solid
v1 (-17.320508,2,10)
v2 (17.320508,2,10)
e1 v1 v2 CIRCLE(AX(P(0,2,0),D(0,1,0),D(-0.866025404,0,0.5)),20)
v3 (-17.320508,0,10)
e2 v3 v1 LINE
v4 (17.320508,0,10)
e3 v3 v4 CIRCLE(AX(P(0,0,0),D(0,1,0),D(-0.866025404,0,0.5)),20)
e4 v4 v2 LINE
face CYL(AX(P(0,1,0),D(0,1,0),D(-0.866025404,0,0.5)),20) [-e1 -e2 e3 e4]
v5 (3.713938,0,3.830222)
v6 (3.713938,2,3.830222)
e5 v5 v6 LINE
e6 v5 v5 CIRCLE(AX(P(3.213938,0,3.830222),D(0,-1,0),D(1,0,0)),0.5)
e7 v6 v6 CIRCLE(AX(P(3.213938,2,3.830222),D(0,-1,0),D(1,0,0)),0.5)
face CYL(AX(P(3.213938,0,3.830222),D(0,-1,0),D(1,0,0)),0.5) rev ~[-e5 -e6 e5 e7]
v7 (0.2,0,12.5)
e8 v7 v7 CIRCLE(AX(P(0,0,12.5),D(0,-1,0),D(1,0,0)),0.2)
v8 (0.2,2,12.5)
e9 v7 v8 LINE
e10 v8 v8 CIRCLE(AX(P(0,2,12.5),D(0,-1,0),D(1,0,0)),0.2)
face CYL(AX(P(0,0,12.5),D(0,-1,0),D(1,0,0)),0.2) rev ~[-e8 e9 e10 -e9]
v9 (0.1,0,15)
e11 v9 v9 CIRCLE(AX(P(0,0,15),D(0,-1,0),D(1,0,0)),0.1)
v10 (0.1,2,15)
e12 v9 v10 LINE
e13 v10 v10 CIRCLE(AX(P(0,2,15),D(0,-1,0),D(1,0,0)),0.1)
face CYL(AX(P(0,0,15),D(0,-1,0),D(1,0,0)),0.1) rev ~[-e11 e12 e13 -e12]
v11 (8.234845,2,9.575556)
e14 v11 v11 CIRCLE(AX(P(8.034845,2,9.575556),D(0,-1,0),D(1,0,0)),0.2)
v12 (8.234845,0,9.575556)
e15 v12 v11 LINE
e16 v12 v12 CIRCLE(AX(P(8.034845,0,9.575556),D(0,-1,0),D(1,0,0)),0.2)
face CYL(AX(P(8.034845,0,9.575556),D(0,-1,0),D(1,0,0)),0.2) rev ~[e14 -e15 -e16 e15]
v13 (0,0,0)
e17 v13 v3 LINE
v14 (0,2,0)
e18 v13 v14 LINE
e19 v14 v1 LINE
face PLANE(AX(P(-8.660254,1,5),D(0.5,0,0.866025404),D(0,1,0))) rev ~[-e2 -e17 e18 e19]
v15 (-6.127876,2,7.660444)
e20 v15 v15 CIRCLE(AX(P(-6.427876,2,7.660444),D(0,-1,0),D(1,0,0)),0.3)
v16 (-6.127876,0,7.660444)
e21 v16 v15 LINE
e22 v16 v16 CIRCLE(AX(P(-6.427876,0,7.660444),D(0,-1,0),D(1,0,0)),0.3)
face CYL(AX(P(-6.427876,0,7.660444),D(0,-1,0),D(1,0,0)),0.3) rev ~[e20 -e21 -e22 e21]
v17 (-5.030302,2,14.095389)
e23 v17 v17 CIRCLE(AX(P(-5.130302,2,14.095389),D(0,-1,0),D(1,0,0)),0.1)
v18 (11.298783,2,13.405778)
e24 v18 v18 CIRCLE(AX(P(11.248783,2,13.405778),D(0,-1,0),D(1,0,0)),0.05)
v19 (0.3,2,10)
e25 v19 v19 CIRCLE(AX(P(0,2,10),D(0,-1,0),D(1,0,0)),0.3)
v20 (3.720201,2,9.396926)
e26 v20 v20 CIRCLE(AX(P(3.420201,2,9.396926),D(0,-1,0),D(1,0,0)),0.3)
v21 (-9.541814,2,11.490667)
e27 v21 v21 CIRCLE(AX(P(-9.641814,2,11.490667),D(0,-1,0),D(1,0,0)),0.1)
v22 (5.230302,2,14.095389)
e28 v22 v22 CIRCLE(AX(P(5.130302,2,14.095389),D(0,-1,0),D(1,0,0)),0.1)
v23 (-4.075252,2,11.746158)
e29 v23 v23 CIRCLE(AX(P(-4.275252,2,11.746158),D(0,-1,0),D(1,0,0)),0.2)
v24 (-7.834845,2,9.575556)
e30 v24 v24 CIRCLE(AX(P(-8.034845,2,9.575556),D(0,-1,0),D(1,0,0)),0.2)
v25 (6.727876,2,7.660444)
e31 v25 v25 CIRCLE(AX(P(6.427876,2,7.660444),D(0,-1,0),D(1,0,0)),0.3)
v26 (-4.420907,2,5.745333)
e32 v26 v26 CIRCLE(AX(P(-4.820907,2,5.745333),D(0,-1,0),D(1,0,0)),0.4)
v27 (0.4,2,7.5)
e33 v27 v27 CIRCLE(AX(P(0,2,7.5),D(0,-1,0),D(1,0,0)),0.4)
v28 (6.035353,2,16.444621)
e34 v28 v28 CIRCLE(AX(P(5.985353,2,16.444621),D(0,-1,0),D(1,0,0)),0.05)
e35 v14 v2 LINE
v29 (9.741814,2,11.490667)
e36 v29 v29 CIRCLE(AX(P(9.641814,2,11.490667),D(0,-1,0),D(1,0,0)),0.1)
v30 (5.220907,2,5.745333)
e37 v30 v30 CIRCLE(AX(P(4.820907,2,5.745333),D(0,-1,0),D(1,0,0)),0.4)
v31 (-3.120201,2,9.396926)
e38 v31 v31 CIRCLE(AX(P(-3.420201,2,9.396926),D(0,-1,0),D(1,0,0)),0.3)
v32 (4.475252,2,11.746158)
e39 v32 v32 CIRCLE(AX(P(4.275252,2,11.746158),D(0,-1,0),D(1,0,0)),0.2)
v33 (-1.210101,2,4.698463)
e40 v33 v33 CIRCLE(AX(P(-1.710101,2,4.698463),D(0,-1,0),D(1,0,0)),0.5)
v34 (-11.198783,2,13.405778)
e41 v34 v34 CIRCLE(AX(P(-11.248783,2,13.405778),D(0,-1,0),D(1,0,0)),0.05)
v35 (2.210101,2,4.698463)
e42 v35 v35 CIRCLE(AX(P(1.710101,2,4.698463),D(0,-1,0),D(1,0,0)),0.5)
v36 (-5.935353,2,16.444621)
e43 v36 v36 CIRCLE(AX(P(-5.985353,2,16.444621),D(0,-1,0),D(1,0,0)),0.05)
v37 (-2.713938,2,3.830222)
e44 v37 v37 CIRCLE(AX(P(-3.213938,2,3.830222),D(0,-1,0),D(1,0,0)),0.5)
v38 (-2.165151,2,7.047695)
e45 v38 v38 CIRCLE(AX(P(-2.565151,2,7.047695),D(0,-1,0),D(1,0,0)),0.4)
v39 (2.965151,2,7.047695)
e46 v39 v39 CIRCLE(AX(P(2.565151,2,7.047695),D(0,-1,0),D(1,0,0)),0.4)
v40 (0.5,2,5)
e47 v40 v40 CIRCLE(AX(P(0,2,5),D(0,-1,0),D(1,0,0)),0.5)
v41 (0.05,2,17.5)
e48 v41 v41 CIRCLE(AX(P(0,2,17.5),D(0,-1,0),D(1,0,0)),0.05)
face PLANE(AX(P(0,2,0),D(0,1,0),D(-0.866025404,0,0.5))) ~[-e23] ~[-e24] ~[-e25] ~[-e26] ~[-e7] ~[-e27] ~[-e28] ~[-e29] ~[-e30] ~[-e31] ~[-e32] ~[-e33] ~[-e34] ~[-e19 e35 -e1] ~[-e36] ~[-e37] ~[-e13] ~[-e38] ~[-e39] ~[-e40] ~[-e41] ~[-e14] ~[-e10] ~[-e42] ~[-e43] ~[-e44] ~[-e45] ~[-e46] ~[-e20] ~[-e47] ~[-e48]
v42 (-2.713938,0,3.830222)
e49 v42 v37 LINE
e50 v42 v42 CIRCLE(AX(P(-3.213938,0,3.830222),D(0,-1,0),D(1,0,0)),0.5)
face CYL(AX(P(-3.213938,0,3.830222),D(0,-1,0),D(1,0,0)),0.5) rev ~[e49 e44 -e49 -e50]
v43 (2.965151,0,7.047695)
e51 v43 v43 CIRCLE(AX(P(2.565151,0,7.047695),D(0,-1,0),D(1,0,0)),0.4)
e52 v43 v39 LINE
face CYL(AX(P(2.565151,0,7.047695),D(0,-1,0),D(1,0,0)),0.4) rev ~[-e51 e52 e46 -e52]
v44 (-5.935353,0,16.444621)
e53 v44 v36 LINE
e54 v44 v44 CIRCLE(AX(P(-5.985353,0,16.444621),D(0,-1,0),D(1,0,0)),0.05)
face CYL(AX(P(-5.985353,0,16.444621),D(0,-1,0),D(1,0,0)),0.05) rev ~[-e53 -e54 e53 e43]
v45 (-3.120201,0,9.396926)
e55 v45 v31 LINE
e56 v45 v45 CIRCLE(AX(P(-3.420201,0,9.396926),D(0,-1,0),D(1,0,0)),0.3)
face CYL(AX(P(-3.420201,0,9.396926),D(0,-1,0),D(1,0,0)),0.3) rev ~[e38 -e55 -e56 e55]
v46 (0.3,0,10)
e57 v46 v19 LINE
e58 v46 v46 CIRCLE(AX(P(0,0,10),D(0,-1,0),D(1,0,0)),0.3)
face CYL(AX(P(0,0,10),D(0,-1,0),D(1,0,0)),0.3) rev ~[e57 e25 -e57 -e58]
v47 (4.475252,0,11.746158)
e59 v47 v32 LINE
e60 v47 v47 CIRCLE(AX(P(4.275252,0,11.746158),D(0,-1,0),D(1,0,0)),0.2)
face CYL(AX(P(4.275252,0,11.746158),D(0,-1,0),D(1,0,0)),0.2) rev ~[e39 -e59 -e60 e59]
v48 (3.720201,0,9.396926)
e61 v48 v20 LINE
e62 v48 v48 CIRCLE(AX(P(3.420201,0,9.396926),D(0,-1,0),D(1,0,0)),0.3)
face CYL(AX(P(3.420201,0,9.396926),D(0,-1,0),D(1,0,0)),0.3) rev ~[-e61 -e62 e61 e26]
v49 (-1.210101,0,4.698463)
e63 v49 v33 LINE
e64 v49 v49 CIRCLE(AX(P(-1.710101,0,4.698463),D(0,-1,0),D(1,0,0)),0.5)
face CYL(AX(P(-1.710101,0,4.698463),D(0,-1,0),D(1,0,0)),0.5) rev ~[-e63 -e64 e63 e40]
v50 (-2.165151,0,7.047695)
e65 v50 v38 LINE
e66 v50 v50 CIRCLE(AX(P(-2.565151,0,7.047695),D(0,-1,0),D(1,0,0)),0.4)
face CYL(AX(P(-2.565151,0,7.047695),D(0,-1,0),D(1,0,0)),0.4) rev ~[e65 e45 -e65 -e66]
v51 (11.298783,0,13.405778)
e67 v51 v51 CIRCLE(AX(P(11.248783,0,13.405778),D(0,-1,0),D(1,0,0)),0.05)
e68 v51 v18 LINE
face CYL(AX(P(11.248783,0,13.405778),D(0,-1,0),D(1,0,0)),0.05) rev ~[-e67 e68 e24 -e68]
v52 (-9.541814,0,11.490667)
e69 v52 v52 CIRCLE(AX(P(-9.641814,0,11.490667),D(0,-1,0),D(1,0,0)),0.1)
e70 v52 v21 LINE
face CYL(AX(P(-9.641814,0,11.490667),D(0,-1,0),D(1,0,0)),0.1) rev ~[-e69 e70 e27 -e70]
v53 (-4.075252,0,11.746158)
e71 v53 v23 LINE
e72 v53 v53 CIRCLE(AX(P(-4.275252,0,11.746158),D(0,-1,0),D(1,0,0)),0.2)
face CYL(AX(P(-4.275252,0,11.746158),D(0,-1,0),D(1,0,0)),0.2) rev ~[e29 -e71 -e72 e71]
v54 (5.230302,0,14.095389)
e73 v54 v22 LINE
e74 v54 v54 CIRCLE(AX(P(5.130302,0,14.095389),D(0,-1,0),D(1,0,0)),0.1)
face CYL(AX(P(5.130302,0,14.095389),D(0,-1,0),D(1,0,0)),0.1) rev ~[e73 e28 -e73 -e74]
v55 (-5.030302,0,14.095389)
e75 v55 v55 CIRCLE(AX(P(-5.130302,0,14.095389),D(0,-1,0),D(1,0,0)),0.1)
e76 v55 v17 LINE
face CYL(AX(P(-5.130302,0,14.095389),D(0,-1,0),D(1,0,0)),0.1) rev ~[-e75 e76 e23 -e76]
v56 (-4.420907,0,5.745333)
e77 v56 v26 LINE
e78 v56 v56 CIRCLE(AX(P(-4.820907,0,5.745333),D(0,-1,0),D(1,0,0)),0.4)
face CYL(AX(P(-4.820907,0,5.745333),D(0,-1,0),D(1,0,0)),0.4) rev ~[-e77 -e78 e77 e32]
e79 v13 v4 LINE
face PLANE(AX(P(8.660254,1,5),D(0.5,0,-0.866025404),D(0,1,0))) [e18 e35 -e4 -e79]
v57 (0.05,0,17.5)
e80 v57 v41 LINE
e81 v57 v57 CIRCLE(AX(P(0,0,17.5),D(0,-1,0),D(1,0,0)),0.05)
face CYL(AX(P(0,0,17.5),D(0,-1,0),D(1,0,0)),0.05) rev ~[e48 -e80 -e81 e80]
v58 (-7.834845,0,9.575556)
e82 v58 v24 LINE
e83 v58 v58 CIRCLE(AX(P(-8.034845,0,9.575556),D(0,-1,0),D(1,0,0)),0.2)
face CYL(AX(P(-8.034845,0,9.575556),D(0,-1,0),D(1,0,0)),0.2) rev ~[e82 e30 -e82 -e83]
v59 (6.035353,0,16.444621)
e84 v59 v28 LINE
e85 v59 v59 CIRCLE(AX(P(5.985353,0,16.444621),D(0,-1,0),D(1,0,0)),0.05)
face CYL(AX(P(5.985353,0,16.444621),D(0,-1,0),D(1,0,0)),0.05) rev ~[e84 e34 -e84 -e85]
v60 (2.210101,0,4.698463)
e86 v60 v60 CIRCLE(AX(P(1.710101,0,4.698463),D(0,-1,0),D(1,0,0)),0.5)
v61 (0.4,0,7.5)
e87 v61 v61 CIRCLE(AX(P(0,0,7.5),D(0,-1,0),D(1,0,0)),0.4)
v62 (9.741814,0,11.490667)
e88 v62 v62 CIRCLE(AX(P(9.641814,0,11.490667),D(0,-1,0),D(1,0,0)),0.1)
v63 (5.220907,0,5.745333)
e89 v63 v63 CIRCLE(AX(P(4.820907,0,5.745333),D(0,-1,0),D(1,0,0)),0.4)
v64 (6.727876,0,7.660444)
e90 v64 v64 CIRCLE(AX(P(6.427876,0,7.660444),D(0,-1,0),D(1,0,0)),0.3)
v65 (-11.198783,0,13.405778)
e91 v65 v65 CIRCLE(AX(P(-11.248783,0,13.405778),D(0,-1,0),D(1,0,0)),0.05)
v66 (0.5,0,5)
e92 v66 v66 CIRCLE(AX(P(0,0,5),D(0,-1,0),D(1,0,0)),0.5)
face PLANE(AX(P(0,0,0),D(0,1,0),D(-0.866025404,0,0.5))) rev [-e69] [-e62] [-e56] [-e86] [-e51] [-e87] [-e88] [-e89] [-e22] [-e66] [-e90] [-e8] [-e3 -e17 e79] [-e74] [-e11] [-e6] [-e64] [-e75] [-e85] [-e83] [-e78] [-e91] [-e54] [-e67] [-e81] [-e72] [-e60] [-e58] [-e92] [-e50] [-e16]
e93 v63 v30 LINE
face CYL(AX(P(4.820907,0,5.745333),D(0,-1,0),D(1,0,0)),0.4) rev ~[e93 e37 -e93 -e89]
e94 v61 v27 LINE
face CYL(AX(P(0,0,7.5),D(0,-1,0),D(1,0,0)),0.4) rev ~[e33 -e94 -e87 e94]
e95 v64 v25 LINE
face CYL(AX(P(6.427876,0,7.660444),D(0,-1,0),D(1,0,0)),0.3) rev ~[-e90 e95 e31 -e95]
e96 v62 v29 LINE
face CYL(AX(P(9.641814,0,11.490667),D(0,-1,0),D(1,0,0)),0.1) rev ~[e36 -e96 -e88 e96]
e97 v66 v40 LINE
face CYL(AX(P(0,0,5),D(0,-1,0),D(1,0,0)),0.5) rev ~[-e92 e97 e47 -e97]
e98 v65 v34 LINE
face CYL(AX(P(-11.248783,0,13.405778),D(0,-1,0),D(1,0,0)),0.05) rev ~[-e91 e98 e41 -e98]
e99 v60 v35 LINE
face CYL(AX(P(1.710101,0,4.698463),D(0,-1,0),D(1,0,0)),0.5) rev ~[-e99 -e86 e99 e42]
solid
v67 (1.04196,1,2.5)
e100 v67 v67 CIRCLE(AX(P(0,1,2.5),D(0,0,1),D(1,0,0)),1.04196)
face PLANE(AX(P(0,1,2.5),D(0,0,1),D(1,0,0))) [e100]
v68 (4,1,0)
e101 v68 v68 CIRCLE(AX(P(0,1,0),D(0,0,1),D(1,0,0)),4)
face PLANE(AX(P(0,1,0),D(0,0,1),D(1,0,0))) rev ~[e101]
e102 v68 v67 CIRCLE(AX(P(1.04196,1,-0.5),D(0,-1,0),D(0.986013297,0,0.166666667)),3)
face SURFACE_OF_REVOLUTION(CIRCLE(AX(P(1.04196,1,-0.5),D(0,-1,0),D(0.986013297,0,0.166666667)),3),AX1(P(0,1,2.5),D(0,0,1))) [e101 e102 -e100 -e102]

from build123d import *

# Parameters (mm, degrees)
F0_W          = 2
F0_H          = 20
F1_ANGLE_BACK = 60
F1_ANGLE      = 120
F2_R          = 4
F3_DEPTH      = 2.5
F5_R          = 0.5
F5_R_2        = 0.4
F5_R_3        = 0.3
F5_R_4        = 0.2
F5_R_5        = 0.1
F5_R_6        = 0.05
F6_DEPTH      = 25


# Not quite as in the source:
# - a fillet or chamfer that OpenCascade refuses, or shapes differently, is made with other operations: its cross-section is extruded or revolved along the edge and cut away or added


with BuildPart() as f1:
    # F0 (on Right) → F1 (revolve)
    with BuildSketch(Plane.YZ, mode=Mode.PRIVATE) as f1_sk:
        with Locations((1, 10)):
            Rectangle(F0_W, F0_H)
    revolve(f1_sk.sketch.rotate(Axis((0, 1, 0), (0, 1, 0)), -F1_ANGLE_BACK), axis=Axis((0, 1, 0), (0, 1, 0)), revolution_arc=F1_ANGLE)

    # F5 (on face) → F6 (cut)
    with BuildSketch(Plane.XZ):
        with Locations((0, 5)):
            Circle(F5_R)
        with Locations((0, 7.5)):
            Circle(F5_R_2)
        with Locations((0, 10)):
            Circle(F5_R_3)
        with Locations((0, 12.5)):
            Circle(F5_R_4)
        with Locations((0, 15)):
            Circle(F5_R_5)
        with Locations((0, 17.5)):
            Circle(F5_R_6)
        with Locations((-5.9853525082, 16.4446208638)):
            Circle(F5_R_6)
        with Locations((-5.1303021499, 14.0953893118)):
            Circle(F5_R_5)
        with Locations((-4.2752517916, 11.7461577598)):
            Circle(F5_R_4)
        with Locations((-3.4202014333, 9.3969262079)):
            Circle(F5_R_3)
        with Locations((-2.5651510749, 7.0476946559)):
            Circle(F5_R_2)
        with Locations((-1.7101007166, 4.6984631039)):
            Circle(F5_R)
        with Locations((-11.2487831695, 13.4057777546)):
            Circle(F5_R_6)
        with Locations((-9.6418141453, 11.4906666468)):
            Circle(F5_R_5)
        with Locations((-8.0348451211, 9.575555539)):
            Circle(F5_R_4)
        with Locations((-6.4278760969, 7.6604444312)):
            Circle(F5_R_3)
        with Locations((-4.8209070726, 5.7453333234)):
            Circle(F5_R_2)
        with Locations((-3.2139380484, 3.8302222156)):
            Circle(F5_R)
        with Locations((11.2487831695, 13.4057777546)):
            Circle(F5_R_6)
        with Locations((9.6418141453, 11.4906666468)):
            Circle(F5_R_5)
        with Locations((8.0348451211, 9.575555539)):
            Circle(F5_R_4)
        with Locations((6.4278760969, 7.6604444312)):
            Circle(F5_R_3)
        with Locations((4.8209070726, 5.7453333234)):
            Circle(F5_R_2)
        with Locations((3.2139380484, 3.8302222156)):
            Circle(F5_R)
        with Locations((5.9853525082, 16.4446208638)):
            Circle(F5_R_6)
        with Locations((5.1303021499, 14.0953893118)):
            Circle(F5_R_5)
        with Locations((4.2752517916, 11.7461577598)):
            Circle(F5_R_4)
        with Locations((3.4202014333, 9.3969262079)):
            Circle(F5_R_3)
        with Locations((2.5651510749, 7.0476946559)):
            Circle(F5_R_2)
        with Locations((1.7101007166, 4.6984631039)):
            Circle(F5_R)
    extrude(amount=-F6_DEPTH, mode=Mode.SUBTRACT)


with BuildPart() as f3:
    # F2 (on Top) → F3 (new body)
    with BuildSketch(Plane.XY):
        with Locations((0, 1)):
            Circle(F2_R)
    extrude(amount=F3_DEPTH)

    # F4: fillet of radius 3 on 1 edges, made by hand

    # F4_s1 → F4_t2 (revolve, cut)
    with BuildSketch(Plane.XZ.offset(-1)):
        with BuildLine():
            ThreePointArc((4, 0), (2.9784517816, 1.7912878475), (1.0419601084, 2.5))
            Line((1.0419601084, 2.5), (4, 2.5))
            Line((4, 2.5), (4, 0))
        make_face()
    revolve(axis=Axis((0, 1, 2.5), (0, 0, 1)), mode=Mode.SUBTRACT)


solid = Compound([f1.part, f3.part])
